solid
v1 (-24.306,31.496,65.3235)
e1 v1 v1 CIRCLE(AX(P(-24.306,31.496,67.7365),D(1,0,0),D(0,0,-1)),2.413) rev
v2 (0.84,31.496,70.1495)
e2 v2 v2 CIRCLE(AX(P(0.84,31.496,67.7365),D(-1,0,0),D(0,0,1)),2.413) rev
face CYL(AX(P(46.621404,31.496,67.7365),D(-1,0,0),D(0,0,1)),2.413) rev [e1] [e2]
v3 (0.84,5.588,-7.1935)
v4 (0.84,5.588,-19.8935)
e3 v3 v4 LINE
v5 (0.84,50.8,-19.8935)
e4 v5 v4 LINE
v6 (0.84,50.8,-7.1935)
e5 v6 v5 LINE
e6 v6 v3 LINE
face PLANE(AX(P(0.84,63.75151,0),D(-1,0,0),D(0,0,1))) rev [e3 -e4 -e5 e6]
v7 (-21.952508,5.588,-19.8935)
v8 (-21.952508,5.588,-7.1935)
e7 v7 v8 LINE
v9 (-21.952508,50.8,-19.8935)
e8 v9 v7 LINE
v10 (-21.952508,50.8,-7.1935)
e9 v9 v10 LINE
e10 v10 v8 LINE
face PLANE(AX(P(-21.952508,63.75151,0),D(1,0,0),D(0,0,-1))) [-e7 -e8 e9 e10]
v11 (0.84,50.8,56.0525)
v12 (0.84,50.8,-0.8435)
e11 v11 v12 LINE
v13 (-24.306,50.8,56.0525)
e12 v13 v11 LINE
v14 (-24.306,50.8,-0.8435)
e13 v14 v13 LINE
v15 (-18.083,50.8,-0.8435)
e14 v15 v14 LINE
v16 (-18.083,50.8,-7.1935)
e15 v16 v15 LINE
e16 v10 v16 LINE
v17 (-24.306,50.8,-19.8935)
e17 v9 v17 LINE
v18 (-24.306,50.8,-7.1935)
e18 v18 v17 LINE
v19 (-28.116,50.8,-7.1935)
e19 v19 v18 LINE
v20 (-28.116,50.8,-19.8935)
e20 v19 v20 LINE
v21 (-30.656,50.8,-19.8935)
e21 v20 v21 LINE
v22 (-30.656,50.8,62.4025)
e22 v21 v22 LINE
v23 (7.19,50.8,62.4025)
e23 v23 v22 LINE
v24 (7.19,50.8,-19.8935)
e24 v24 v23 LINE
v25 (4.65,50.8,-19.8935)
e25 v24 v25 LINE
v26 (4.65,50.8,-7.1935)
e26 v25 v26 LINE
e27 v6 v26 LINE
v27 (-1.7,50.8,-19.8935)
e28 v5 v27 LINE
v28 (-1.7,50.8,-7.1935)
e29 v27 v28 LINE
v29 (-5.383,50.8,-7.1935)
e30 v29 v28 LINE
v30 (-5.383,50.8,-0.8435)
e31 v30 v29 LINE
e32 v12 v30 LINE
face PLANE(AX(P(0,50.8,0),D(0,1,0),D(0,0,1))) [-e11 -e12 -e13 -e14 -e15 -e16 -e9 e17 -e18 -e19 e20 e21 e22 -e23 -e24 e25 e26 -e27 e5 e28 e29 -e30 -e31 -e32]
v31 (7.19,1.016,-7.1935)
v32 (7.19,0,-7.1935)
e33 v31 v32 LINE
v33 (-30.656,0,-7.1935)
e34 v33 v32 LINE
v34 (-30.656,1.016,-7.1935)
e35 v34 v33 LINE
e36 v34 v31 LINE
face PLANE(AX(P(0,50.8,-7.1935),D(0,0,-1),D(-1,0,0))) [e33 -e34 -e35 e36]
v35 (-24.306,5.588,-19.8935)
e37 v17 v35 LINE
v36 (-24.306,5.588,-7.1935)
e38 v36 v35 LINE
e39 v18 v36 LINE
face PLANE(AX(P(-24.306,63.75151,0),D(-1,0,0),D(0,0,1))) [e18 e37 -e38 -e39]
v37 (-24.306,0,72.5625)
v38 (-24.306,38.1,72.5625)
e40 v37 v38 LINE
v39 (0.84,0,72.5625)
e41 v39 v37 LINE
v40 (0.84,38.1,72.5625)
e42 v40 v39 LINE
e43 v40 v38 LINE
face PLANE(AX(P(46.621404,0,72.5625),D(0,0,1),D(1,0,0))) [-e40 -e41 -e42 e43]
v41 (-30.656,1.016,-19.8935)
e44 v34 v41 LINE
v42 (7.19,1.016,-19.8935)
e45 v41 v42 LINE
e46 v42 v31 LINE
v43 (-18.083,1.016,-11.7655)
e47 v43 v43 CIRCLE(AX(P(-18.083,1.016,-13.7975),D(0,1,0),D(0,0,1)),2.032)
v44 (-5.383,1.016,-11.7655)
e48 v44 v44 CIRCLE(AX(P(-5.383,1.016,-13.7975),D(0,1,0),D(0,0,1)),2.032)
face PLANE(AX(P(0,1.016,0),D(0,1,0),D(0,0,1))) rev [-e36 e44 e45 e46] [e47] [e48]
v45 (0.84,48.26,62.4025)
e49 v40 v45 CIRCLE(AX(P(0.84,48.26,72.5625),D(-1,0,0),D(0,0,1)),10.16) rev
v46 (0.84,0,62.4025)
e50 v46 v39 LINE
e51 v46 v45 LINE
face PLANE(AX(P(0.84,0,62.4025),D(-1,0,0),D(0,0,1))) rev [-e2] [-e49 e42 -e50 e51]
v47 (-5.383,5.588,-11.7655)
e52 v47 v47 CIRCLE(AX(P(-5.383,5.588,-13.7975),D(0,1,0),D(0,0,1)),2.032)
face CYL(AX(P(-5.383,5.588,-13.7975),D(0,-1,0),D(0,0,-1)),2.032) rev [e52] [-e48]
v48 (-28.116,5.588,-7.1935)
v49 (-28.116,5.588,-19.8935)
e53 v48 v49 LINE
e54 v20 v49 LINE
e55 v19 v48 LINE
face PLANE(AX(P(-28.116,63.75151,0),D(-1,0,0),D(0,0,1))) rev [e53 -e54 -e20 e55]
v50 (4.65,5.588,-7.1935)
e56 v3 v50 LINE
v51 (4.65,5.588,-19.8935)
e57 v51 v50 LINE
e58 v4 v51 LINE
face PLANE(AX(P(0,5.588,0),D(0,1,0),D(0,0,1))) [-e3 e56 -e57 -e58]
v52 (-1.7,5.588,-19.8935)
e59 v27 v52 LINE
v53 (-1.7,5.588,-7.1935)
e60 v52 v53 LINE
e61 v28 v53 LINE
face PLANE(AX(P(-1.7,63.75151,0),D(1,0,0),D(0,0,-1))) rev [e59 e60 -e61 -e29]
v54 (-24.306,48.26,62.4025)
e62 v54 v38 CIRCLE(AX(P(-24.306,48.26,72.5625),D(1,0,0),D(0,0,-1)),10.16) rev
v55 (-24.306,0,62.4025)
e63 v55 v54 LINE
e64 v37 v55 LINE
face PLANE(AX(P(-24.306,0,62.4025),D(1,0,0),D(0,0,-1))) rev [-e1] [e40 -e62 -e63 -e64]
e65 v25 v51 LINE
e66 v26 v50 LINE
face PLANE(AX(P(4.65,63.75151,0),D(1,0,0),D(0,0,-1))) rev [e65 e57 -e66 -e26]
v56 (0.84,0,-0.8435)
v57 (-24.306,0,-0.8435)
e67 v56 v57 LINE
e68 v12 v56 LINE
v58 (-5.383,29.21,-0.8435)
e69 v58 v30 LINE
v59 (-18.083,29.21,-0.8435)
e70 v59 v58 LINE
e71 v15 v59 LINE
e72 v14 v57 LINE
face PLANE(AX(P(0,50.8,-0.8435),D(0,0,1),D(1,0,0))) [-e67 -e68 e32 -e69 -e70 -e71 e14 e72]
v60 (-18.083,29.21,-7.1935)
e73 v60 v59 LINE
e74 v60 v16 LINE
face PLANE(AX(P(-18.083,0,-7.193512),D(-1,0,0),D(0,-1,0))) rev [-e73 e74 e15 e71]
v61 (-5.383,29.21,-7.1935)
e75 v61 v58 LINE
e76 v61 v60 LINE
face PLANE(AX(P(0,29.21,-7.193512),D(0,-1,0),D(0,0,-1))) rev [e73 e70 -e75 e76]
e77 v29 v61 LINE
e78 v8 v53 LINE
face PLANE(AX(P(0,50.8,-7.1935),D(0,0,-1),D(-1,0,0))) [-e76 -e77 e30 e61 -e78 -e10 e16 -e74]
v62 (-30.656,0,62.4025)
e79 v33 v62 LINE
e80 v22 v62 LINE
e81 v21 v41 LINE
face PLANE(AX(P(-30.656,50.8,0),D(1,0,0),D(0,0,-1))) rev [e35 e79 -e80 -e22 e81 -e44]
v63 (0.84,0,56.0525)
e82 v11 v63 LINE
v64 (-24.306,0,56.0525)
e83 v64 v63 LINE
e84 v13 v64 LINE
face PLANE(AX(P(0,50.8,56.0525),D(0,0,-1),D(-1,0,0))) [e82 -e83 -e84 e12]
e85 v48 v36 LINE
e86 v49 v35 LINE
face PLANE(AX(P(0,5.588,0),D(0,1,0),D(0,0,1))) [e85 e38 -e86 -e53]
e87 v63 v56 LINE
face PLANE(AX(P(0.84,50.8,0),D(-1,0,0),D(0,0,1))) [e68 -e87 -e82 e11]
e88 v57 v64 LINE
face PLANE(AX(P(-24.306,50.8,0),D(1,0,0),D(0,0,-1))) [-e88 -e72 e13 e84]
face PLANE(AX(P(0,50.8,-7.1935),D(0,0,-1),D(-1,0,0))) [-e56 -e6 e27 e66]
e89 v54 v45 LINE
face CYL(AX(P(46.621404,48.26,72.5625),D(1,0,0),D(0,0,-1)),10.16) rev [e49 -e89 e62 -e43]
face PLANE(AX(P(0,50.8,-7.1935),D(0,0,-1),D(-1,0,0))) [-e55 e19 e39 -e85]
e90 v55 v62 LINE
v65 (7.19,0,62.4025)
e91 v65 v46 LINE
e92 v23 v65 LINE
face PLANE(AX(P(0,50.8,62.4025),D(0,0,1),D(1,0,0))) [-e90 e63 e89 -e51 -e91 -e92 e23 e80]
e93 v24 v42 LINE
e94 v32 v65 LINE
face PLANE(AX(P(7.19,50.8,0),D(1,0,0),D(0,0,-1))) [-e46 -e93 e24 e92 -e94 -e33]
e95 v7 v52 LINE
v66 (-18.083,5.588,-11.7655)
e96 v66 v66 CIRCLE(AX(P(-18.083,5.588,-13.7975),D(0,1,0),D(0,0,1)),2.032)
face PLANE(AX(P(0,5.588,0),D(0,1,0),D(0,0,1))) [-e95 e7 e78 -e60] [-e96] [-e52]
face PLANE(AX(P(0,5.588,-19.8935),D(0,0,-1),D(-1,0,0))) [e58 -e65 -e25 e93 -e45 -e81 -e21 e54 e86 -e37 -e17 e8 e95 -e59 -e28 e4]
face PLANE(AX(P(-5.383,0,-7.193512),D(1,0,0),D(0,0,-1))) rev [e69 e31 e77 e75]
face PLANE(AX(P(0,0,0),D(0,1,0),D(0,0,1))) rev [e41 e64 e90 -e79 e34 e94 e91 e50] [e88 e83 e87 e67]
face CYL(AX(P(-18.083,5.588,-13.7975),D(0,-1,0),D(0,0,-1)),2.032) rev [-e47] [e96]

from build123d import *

# Parameters (mm, degrees)
BOSS_EXTRUDE1_DEPTH     = 50.8
CUT_EXTRUDE1_DEPTH      = 92.455090356
CUT_EXTRUDE1_DEPTH_BACK = 50.8
SKETCH4_W               = 37.846
SKETCH4_H               = 12.7
SKETCH4_R               = 2.032
BOSS_EXTRUDE2_DEPTH     = 4.572
SKETCH7_W               = 2.54
SKETCH7_H               = 12.7
SKETCH7_W_2             = 2.353491512
BOSS_EXTRUDE3_DEPTH     = 45.212
BOSS_EXTRUDE4_DEPTH     = 37.846
FILLET1_R               = 10.16
SKETCH9_W               = 6.35
SKETCH9_H               = 13.184190116
CUT_EXTRUDE2_DEPTH      = 94.73231429


with BuildPart() as part:
    # Sketch1 → Boss-Extrude1 (new body)
    with BuildSketch(Plane(origin=(0, 0, 0), x_dir=(1, 0, 0), z_dir=(0, 1, 0))):
        Polygon((-24.306, -56.0525), (-24.306, -27.6045), (-30.656, -27.6045), (-30.656, -62.4025), (7.19, -62.4025), (7.19, 7.1935), (-11.733, 7.1935), (-11.733, 0.8435), (0.84, 0.8435), (0.84, -56.0525), align=None)
        Polygon((-24.306, -27.6045), (-24.306, 0.8435), (-11.733, 0.8435), (-11.733, 7.1935), (-30.656, 7.1935), (-30.656, -27.6045), align=None)
    extrude(amount=BOSS_EXTRUDE1_DEPTH)

    # Sketch3 → Cut-Extrude1 (cut, two sides: drawn at the far end of the back side and taken through both)
    with BuildSketch(Plane(origin=(0, 0, -7.1935), x_dir=(-1, 0, 0), z_dir=(0, 0, -1)).offset(-CUT_EXTRUDE1_DEPTH_BACK)):
        Polygon((5.383, 29.21), (11.733, 29.21), (18.083, 29.21), (18.083, 50.8), (5.383, 50.8), align=None)
    extrude(amount=CUT_EXTRUDE1_DEPTH + CUT_EXTRUDE1_DEPTH_BACK, mode=Mode.SUBTRACT)

    # Sketch4 → Boss-Extrude2 (add)
    with BuildSketch(Plane(origin=(0, 1.016, 0), x_dir=(1, 0, 0), z_dir=(0, 1, 0))):
        with Locations((-11.733, 13.5435)):
            Rectangle(SKETCH4_W, SKETCH4_H)
        with Locations(Location((-18.083, 13.7975, 0), (0, 0, 270))):
            Circle(SKETCH4_R, mode=Mode.SUBTRACT)
        with Locations(Location((-5.383, 13.7975, 0), (0, 0, 270))):
            Circle(SKETCH4_R, mode=Mode.SUBTRACT)
    extrude(amount=BOSS_EXTRUDE2_DEPTH)

    # Sketch7 → Boss-Extrude3 (add)
    with BuildSketch(Plane(origin=(0, 5.588, 0), x_dir=(1, 0, 0), z_dir=(0, 1, 0))):
        with Locations((5.92, 13.5435)):
            Rectangle(SKETCH7_W, SKETCH7_H)
        with Locations((-0.43, 13.5435)):
            Rectangle(SKETCH7_W, SKETCH7_H)
        with Locations((-23.129254244, 13.5435)):
            Rectangle(SKETCH7_W_2, SKETCH7_H)
        with Locations((-29.386, 13.5435)):
            Rectangle(SKETCH7_W, SKETCH7_H)
    extrude(amount=BOSS_EXTRUDE3_DEPTH)

    # Sketch8 → Boss-Extrude4 (add)
    with BuildSketch(Plane.ZY.offset(30.656)):
        with BuildLine():
            Line((71.5465, 31.496), (70.1495, 31.496))
            ThreePointArc((70.1495, 31.496), (67.7365, 29.083), (65.3235, 31.496))
            Line((65.3235, 31.496), (62.4025, 31.496))
            Line((62.4025, 31.496), (62.4025, 0))
            Line((62.4025, 0), (71.5465, 0))
            Line((71.5465, 0), (71.5465, 31.496))
        make_face()
        with BuildLine():
            ThreePointArc((65.3235, 31.496), (67.7365, 33.909), (70.1495, 31.496))
            Line((70.1495, 31.496), (71.5465, 31.496))
            Line((71.5465, 31.496), (71.5465, 0))
            Line((71.5465, 0), (72.5625, 0))
            Line((72.5625, 0), (72.5625, 38.1))
            Line((72.5625, 38.1), (62.4025, 38.1))
            Line((62.4025, 38.1), (62.4025, 31.496))
            Line((62.4025, 31.496), (65.3235, 31.496))
        make_face()
    extrude(amount=-BOSS_EXTRUDE4_DEPTH)

    # Fillet1
    fillet1_edges = [part.edges().sort_by_distance(p)[0] for p in [
        (-11.733, 38.1, 62.4025),
    ]]
    fillet(fillet1_edges, radius=FILLET1_R - 0.0001)  # a hair under: the kernel refuses the full size

    # Sketch9 → Cut-Extrude2 (cut, through all)
    with BuildSketch(Plane(origin=(0, 50.8, 0), x_dir=(1, 0, 0), z_dir=(0, 1, 0))):
        with Locations((-27.481, -68.994595058)):
            Rectangle(SKETCH9_W, SKETCH9_H)
        Polygon((7.19, -62.4025), (0.84, -62.4025), (0.84, -76.255559197), (7.295762748, -76.255559197), align=None)
    extrude(amount=-CUT_EXTRUDE2_DEPTH, mode=Mode.SUBTRACT)


solid = part.part
